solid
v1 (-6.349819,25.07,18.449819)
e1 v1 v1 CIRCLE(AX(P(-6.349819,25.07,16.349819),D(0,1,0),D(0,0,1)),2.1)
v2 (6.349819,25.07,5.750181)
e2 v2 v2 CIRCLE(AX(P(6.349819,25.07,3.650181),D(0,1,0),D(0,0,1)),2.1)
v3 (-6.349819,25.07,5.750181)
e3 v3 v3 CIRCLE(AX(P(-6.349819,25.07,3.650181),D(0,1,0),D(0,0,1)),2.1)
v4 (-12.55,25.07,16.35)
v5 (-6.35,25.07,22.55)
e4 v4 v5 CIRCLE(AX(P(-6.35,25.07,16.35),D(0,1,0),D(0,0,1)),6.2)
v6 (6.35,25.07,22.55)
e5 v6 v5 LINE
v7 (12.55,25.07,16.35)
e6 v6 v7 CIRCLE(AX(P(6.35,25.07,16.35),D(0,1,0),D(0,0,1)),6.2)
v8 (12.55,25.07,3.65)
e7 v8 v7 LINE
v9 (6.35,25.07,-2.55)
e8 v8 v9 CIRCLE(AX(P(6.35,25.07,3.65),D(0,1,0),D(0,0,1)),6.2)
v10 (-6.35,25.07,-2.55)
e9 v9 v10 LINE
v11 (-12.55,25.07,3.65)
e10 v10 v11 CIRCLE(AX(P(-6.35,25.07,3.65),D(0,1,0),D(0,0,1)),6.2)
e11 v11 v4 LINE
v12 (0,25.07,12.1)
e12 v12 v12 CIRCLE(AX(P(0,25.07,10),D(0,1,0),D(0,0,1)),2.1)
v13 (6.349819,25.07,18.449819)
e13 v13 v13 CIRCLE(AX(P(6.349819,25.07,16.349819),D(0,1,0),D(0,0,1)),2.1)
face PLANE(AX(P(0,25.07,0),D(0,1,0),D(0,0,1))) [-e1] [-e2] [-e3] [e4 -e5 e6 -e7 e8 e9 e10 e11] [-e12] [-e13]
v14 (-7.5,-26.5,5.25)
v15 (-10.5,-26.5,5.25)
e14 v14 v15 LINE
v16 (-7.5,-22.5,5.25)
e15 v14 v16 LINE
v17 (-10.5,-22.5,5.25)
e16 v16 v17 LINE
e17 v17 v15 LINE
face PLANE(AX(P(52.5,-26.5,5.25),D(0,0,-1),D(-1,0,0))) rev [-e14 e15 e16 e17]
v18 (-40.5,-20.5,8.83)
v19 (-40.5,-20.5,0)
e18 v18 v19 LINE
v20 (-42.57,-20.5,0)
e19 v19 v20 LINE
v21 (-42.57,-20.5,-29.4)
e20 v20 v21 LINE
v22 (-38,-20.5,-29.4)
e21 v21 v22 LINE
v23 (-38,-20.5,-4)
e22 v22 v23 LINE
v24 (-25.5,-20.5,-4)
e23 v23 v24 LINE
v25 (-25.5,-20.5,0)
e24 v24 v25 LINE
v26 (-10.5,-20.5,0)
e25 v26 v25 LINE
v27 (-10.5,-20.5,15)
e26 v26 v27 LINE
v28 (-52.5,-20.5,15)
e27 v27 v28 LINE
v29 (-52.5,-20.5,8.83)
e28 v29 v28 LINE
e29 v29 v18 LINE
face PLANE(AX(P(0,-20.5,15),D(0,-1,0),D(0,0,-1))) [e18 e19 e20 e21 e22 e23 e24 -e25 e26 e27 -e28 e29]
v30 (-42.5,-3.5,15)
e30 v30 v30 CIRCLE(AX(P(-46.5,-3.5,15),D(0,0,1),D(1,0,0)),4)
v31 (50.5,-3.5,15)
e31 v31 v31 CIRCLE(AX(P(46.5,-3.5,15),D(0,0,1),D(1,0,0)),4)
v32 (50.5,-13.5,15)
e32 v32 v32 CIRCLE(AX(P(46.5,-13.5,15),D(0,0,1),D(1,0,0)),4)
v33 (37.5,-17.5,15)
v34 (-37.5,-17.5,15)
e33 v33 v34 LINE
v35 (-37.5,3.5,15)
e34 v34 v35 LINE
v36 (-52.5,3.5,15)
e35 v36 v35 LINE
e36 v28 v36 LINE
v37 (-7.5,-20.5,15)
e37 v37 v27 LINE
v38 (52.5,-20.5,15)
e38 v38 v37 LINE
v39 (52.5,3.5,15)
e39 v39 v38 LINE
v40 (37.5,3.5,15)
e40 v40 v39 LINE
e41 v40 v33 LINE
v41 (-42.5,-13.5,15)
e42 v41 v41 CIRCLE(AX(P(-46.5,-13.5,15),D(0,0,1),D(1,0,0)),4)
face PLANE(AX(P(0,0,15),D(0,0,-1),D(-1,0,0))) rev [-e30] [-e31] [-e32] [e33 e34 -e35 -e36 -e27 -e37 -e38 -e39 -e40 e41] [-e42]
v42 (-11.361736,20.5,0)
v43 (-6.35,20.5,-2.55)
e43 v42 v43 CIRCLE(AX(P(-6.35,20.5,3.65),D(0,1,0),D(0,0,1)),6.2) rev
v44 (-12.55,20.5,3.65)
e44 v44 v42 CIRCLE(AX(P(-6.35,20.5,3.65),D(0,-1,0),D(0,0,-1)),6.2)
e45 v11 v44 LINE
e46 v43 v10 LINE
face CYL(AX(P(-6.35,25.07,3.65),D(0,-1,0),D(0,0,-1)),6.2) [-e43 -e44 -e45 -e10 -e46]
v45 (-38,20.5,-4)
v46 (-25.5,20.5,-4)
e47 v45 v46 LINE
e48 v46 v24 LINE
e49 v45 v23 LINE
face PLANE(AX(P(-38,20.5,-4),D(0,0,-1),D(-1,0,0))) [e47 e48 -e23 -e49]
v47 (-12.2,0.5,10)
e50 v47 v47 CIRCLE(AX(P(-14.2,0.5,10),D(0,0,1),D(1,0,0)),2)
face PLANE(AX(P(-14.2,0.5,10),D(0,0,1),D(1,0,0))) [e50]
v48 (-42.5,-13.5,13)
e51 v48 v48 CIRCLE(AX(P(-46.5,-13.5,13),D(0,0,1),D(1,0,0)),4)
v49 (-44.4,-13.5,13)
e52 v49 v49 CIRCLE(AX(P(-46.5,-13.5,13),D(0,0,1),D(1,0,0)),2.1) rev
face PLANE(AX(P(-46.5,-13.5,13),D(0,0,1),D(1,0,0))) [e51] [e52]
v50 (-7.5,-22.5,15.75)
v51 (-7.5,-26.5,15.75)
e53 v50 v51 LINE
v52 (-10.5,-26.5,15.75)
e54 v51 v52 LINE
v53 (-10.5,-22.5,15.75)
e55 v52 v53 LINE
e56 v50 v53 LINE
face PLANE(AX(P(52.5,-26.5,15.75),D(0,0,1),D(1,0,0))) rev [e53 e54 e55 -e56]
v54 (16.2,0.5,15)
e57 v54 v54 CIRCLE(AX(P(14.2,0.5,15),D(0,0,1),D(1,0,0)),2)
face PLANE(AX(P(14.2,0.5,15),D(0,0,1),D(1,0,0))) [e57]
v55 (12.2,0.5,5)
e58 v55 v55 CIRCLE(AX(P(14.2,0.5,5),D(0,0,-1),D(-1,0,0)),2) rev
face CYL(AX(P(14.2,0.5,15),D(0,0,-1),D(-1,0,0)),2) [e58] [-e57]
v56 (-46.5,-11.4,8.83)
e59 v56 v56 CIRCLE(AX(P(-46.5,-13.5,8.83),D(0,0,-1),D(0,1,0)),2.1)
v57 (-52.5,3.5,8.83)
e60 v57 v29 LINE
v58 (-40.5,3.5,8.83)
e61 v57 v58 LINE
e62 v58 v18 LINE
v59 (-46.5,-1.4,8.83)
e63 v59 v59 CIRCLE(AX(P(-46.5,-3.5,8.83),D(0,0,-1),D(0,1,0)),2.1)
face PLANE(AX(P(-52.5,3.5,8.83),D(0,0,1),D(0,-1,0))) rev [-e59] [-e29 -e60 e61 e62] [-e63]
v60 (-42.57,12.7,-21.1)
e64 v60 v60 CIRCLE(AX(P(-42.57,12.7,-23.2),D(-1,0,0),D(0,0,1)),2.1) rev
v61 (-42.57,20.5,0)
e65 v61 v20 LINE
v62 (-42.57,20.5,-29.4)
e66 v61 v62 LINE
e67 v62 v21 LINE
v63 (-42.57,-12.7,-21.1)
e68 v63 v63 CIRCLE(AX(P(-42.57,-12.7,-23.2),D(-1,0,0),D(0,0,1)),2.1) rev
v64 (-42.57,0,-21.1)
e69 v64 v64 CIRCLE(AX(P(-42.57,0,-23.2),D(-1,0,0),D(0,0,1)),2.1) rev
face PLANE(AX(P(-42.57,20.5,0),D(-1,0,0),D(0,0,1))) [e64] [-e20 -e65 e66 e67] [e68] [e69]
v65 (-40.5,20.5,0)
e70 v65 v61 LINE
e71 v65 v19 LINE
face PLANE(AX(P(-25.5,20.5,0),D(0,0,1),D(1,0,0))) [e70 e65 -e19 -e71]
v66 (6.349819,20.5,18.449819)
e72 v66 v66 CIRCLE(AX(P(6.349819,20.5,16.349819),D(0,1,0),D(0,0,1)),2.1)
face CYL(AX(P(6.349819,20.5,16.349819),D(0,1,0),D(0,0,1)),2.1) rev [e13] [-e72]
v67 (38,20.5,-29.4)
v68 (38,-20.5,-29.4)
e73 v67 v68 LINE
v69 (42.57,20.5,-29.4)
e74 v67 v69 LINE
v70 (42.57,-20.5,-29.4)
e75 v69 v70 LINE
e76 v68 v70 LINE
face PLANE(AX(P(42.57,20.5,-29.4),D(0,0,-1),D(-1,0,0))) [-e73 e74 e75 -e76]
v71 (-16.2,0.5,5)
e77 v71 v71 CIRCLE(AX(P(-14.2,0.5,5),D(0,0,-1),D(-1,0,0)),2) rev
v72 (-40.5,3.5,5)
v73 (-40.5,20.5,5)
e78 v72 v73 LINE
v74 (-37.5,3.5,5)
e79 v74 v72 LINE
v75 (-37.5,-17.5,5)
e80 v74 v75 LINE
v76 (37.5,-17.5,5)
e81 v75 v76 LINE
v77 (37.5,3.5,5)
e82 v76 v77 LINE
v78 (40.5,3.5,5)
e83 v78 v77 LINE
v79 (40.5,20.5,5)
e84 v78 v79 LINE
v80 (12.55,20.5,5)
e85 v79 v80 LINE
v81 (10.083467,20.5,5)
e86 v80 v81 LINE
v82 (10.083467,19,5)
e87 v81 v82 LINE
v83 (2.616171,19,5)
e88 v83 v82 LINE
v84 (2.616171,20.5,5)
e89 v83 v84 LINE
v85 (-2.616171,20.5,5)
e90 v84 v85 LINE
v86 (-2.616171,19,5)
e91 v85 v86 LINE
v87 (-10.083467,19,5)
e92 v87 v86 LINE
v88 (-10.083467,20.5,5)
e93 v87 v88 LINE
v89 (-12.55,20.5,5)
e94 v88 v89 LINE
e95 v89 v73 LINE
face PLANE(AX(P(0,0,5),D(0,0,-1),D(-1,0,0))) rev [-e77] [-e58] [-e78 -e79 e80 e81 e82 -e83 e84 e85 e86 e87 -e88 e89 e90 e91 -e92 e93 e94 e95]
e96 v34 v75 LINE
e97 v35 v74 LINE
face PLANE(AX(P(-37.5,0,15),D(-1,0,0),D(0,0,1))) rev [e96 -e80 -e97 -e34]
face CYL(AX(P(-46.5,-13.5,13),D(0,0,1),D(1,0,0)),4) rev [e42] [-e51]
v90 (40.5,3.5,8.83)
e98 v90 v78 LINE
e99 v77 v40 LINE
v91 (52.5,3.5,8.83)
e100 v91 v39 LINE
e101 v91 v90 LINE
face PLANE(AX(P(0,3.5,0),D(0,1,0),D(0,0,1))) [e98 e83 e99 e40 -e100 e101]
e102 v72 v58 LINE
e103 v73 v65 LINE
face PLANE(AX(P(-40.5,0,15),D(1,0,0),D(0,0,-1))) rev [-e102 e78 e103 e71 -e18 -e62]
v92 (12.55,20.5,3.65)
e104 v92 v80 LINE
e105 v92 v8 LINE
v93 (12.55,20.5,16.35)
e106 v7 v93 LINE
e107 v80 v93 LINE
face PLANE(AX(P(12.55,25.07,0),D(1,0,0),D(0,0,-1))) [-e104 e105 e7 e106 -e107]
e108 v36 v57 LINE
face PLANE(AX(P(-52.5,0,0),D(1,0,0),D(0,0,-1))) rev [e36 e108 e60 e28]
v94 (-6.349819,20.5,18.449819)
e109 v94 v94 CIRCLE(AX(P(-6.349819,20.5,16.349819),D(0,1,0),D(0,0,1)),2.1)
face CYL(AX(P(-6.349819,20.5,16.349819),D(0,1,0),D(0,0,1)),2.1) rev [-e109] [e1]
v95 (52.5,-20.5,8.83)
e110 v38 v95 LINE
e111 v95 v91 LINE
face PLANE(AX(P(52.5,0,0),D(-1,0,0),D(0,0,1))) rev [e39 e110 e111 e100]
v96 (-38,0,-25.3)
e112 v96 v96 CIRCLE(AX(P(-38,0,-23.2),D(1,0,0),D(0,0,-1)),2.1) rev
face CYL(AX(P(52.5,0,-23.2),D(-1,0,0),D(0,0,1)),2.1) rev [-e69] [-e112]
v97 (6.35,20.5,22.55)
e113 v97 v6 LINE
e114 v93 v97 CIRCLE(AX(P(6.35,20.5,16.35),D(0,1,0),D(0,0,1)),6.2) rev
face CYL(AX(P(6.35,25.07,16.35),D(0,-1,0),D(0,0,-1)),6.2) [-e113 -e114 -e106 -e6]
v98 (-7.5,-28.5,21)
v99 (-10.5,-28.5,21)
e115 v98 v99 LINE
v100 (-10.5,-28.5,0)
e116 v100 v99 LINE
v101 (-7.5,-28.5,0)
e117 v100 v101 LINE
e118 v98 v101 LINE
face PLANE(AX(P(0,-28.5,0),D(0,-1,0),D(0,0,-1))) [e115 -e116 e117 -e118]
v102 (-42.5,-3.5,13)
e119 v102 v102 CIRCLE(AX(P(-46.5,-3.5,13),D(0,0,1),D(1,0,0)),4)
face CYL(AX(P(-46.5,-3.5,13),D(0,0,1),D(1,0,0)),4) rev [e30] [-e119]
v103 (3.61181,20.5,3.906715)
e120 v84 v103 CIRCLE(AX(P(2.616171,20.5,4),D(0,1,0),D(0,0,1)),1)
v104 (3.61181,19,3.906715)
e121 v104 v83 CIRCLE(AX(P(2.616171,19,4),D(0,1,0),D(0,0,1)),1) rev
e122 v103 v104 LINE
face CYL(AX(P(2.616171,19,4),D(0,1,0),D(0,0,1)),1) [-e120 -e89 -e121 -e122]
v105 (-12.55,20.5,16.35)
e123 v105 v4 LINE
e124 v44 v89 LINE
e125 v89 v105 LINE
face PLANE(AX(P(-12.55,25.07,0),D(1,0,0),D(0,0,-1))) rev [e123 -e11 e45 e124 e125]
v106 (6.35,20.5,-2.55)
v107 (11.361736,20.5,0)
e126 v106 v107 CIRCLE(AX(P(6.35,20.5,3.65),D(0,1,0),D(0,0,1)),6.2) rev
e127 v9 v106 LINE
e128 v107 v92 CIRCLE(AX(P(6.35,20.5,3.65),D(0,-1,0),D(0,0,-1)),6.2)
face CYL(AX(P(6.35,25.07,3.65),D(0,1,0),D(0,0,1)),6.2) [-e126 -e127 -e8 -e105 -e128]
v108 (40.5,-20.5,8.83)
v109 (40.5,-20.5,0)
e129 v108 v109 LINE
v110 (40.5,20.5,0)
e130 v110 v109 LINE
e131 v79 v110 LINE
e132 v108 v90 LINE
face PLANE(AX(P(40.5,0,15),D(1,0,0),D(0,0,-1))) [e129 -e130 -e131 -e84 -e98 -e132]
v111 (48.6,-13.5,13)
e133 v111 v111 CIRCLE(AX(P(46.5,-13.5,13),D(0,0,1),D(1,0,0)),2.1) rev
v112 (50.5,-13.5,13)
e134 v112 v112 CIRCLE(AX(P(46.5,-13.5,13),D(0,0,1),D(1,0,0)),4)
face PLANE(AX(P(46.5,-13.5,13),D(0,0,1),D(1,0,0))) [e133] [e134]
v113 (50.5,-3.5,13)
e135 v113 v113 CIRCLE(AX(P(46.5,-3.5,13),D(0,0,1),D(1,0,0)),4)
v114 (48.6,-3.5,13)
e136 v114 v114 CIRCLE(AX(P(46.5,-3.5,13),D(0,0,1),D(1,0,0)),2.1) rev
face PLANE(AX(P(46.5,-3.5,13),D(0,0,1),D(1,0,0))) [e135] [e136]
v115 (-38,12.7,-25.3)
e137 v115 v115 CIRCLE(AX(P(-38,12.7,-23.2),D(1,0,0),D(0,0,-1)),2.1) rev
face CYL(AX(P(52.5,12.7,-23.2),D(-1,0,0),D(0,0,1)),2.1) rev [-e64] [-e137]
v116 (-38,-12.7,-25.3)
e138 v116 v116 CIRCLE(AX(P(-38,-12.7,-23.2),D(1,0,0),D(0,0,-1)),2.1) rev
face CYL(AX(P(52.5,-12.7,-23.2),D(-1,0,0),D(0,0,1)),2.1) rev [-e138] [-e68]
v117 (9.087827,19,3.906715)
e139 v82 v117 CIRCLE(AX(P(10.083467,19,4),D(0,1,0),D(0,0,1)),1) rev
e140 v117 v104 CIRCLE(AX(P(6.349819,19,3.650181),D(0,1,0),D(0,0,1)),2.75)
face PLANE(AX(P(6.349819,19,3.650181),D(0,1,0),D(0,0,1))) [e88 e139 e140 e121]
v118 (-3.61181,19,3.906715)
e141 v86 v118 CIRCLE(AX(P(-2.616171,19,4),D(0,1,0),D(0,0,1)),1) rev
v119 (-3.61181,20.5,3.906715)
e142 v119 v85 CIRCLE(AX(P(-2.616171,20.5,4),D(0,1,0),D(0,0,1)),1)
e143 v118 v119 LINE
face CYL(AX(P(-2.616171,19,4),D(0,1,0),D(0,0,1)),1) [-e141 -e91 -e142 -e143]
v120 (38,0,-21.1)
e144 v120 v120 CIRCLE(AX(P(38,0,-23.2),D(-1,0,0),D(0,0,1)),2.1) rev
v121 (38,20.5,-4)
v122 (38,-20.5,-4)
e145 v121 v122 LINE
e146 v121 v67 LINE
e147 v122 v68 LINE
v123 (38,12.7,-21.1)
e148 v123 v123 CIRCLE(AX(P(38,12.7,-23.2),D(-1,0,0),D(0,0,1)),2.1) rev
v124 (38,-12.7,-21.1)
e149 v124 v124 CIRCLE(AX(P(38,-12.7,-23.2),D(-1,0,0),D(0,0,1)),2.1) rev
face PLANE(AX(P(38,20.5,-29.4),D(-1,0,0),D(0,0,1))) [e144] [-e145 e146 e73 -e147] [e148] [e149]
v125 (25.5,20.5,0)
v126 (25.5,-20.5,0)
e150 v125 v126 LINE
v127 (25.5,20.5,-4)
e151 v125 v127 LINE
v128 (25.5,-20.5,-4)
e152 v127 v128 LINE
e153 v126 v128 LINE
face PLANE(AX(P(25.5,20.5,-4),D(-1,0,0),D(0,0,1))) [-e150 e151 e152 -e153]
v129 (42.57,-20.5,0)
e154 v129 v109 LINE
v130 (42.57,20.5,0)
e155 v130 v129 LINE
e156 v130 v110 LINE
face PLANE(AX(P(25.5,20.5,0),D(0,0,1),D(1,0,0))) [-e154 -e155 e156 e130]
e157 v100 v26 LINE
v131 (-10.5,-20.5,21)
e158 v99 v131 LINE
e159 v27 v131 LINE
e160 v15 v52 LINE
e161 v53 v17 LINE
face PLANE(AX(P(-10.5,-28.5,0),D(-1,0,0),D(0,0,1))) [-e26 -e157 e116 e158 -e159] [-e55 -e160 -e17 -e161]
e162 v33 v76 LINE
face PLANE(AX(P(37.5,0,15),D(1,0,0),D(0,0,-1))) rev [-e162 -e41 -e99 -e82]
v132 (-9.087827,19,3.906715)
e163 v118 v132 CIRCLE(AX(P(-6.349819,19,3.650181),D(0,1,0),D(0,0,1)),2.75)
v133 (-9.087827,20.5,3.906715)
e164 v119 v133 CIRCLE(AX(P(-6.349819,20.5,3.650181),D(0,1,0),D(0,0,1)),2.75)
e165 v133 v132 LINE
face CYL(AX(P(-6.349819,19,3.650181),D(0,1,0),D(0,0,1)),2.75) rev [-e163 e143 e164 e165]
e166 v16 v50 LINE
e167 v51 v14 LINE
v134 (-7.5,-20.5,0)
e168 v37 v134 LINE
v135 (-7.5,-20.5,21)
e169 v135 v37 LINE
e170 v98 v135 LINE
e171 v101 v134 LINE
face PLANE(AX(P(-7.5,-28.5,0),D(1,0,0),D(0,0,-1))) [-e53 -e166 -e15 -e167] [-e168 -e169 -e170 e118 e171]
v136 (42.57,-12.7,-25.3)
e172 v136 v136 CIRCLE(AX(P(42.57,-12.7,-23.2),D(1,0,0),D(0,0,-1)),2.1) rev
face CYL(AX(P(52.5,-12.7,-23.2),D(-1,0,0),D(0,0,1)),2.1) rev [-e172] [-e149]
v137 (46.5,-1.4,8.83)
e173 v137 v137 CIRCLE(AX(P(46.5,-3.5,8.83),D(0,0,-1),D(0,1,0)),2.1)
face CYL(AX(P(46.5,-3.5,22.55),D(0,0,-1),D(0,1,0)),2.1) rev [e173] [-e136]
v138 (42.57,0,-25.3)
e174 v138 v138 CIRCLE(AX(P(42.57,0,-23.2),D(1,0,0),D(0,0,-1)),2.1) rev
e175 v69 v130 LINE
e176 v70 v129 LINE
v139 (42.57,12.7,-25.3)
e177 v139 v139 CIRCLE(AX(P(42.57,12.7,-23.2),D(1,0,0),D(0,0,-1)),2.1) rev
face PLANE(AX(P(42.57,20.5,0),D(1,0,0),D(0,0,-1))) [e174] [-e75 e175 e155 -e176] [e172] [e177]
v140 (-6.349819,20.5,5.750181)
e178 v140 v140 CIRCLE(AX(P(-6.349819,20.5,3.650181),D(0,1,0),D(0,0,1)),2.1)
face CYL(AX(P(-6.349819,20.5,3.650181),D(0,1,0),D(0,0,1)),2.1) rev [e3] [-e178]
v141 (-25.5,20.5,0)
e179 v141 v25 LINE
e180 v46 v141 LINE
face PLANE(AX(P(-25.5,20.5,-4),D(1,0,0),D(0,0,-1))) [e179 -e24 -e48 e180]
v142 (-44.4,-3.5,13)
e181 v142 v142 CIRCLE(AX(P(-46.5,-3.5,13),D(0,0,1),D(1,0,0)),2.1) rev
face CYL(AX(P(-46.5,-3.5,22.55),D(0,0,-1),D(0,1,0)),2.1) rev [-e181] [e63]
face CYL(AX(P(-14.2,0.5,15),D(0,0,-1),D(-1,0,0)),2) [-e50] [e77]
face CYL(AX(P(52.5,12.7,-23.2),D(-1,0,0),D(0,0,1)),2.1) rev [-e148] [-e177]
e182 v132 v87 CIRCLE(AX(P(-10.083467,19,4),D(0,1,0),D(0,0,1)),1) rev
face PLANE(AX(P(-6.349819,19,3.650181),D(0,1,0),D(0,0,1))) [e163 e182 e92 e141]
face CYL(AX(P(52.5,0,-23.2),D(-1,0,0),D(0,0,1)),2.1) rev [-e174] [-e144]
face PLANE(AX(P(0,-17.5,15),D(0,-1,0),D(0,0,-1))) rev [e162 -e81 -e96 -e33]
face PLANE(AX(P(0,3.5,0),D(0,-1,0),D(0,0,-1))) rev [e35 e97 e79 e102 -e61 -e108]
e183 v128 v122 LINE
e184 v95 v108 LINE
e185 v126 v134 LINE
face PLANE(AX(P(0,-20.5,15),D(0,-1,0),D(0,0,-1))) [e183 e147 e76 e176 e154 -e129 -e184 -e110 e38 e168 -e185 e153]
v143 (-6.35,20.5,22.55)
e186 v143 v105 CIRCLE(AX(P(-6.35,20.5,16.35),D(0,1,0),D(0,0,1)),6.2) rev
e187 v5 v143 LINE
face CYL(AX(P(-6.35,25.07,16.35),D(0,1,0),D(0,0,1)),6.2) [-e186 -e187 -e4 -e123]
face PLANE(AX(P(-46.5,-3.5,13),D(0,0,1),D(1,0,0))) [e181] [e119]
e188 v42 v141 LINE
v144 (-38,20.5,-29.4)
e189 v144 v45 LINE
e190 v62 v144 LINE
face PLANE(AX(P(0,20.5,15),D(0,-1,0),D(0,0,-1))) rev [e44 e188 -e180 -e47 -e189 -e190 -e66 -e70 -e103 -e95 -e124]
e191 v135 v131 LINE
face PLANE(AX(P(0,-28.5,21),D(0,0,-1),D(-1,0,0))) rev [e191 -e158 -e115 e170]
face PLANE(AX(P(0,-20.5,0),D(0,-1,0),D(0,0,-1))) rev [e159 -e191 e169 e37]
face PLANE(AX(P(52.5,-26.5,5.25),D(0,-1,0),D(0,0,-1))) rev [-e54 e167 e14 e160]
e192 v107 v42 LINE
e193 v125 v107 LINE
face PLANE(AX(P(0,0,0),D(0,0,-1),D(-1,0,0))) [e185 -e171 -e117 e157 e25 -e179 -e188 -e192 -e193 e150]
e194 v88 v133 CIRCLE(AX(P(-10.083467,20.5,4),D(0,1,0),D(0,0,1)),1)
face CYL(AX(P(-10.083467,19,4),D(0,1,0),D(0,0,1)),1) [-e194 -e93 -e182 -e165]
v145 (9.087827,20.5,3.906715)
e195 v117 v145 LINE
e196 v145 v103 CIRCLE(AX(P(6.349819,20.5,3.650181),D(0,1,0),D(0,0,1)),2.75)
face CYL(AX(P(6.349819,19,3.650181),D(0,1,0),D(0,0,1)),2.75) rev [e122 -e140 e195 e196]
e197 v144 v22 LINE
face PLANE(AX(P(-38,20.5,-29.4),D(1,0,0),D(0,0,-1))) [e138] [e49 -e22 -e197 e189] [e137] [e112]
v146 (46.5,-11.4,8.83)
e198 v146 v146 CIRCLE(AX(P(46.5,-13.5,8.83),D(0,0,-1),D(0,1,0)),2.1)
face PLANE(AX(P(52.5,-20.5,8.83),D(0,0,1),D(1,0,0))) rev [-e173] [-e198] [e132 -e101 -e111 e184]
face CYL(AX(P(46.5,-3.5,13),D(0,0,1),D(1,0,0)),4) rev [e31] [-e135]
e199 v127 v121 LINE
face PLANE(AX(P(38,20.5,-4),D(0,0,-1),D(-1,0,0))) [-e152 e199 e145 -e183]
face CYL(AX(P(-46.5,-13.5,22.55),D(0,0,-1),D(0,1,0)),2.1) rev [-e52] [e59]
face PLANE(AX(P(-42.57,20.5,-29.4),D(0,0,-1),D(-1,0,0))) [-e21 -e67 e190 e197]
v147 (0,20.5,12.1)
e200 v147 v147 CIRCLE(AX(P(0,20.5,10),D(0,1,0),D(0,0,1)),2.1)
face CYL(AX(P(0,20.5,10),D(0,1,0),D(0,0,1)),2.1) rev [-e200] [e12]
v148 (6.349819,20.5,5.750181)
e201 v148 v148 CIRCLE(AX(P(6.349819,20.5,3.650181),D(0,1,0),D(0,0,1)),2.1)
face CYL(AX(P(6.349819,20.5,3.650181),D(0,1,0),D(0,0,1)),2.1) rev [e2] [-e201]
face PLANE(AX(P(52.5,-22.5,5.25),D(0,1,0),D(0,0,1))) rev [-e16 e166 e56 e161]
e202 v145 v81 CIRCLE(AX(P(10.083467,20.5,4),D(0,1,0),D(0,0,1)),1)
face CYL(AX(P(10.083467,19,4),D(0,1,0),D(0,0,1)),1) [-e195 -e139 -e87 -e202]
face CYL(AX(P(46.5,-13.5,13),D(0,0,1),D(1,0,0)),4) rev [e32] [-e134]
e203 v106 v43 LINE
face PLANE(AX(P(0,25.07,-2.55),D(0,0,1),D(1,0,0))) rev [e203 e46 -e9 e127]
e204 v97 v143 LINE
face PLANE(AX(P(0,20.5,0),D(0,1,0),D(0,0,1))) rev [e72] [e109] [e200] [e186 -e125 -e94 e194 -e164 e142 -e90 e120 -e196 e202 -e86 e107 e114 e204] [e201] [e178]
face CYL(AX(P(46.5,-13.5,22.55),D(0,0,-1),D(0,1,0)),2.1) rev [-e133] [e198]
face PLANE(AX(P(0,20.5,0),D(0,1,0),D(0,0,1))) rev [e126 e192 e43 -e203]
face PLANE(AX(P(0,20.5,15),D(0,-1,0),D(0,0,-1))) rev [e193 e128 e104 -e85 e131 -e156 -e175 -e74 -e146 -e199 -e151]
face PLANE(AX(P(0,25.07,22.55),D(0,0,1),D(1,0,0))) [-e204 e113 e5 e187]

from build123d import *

# Parameters (mm, degrees)
SKETCH1_W                = 75
SKETCH1_H                = 35
BOSS_EXTRUDE1_DEPTH      = 5
SKETCH2_R                = 2
BOSS_EXTRUDE2_DEPTH      = 10
SKETCH3_W                = 75
SKETCH3_H                = 35
BOSS_EXTRUDE3_DEPTH      = 15
CUT_EXTRUDE2_DEPTH       = 10
SKETCH8_W                = 12.55
SKETCH8_H                = 5
SKETCH8_H_2              = 2.55
BOSS_EXTRUDE6_DEPTH      = 4.57
SKETCH9_R                = 2.1
CUT_EXTRUDE3_DEPTH       = 4.57
SKETCH14_W               = 3
SKETCH14_H               = 10
CUT_EXTRUDE5_DEPTH       = 17
SKETCH15_R               = 2.75
CUT_EXTRUDE6_DEPTH       = 1.5
FILLET1_R                = 1
CUT_EXTRUDE7_START       = -5
SKETCH19_R               = 2
CUT_EXTRUDE7_DEPTH       = 5
SKETCH20_W               = 6.17
SKETCH20_H               = 24
BOSS_EXTRUDE7_DEPTH      = 12
SKETCH21_W               = 6.17
SKETCH21_H               = 24
BOSS_EXTRUDE8_DEPTH      = 12
SKETCH24_R               = 2.1
CUT_EXTRUDE8_DEPTH       = 60.774520492
SKETCH25_R               = 4
CUT_EXTRUDE9_DEPTH       = 2
SKETCH26_W               = 3
SKETCH26_H               = 15
SKETCH26_H_2             = 6
BOSS_EXTRUDE9_DEPTH      = 8
SKETCH27_W               = 10.5
SKETCH27_H               = 4
CUT_EXTRUDE10_DEPTH      = 73.730684721
BOSS_EXTRUDE10_DEPTH     = 41
CUT_EXTRUDE11_DEPTH      = 100.332069343
CUT_EXTRUDE11_DEPTH_BACK = 100.332069343
SKETCH30_R               = 2.1
FILLET2_R                = 6.2


with BuildPart() as part:
    # Sketch1 → Boss-Extrude1 (new body)
    with BuildSketch(Plane.XY):
        Rectangle(SKETCH1_W, SKETCH1_H)
    extrude(amount=BOSS_EXTRUDE1_DEPTH)

    # Sketch2 → Boss-Extrude2 (add)
    with BuildSketch(Plane.XY.offset(5)):
        with Locations(Location((-14.2, 0.5, 0), (0, 0, 180))):
            Circle(SKETCH2_R)
        with Locations(Location((14.2, 0.5, 0), (0, 0, 180))):
            Circle(SKETCH2_R)
    extrude(amount=BOSS_EXTRUDE2_DEPTH)

    # Sketch3 → Boss-Extrude3 (add)
    with BuildSketch(Plane(origin=(0, 0, 0), x_dir=(-1, 0, 0), z_dir=(0, 0, -1))):
        Polygon((40.5, 20.5), (-37.5, 20.5), (-40.5, 20.5), (-40.5, -20.5), (40.5, -20.5), (40.5, -17.5), align=None)
        Rectangle(SKETCH3_W, SKETCH3_H, mode=Mode.SUBTRACT)
    extrude(amount=-BOSS_EXTRUDE3_DEPTH)

    # Sketch4 → Cut-Extrude2 (cut)
    with BuildSketch(Plane(origin=(0, 20.5, 0), x_dir=(1, 0, 0), z_dir=(0, 1, 0))):
        Polygon((-37.5, -5), (-37.5, -12.5), (-37.5, -14), (-37.5, -15), (37.5, -15), (37.5, -14), (37.5, -12.5), (37.5, -5), align=None)
    extrude(amount=-CUT_EXTRUDE2_DEPTH, mode=Mode.SUBTRACT)

    # Sketch8 → Boss-Extrude6 (add)
    with BuildSketch(Plane(origin=(0, 20.5, 0), x_dir=(1, 0, 0), z_dir=(0, 1, 0))):
        Polygon((0, -15), (0, -5), (-12.55, -5), (-12.55, -22.55), (0, -22.55), align=None)
        Polygon((12.55, -5), (0, -5), (0, -15), (0, -22.55), (12.55, -22.55), align=None)
        with Locations((-6.275, -2.5)):
            Rectangle(SKETCH8_W, SKETCH8_H)
        with Locations((-6.275, 1.275)):
            Rectangle(SKETCH8_W, SKETCH8_H_2)
        with Locations((6.275, 1.275)):
            Rectangle(SKETCH8_W, SKETCH8_H_2)
        with Locations((6.275, -2.5)):
            Rectangle(SKETCH8_W, SKETCH8_H)
    extrude(amount=BOSS_EXTRUDE6_DEPTH)

    # Sketch9 → Cut-Extrude3 (cut)
    with BuildSketch(Plane(origin=(0, 25.07, 0), x_dir=(1, 0, 0), z_dir=(0, 1, 0))):
        with Locations(Location((0, -10, 0), (0, 0, 270))):
            Circle(SKETCH9_R)
        with Locations(Location((-6.349818895, -3.650181105, 0), (0, 0, 270))):
            Circle(SKETCH9_R)
        with Locations(Location((6.349818895, -3.650181105, 0), (0, 0, 270))):
            Circle(SKETCH9_R)
        with Locations(Location((6.349818895, -16.349818895, 0), (0, 0, 270))):
            Circle(SKETCH9_R)
        with Locations(Location((-6.349818895, -16.349818895, 0), (0, 0, 270))):
            Circle(SKETCH9_R)
    extrude(amount=-CUT_EXTRUDE3_DEPTH, mode=Mode.SUBTRACT)

    # Sketch14 → Cut-Extrude5 (cut)
    with BuildSketch(Plane(origin=(0, 20.5, 0), x_dir=(1, 0, 0), z_dir=(0, 1, 0))):
        with Locations((-39, -10)):
            Rectangle(SKETCH14_W, SKETCH14_H)
        with Locations((39, -10)):
            Rectangle(SKETCH14_W, SKETCH14_H)
    extrude(amount=-CUT_EXTRUDE5_DEPTH, mode=Mode.SUBTRACT)

    # Sketch15 → Cut-Extrude6 (cut)
    with BuildSketch(Plane(origin=(0, 20.5, 0), x_dir=(1, 0, 0), z_dir=(0, 1, 0))):
        with Locations((-6.349818895, -3.650181105)):
            Circle(SKETCH15_R)
        with Locations((6.349818895, -3.650181105)):
            Circle(SKETCH15_R)
    extrude(amount=-CUT_EXTRUDE6_DEPTH, mode=Mode.SUBTRACT)

    # Fillet1
    fillet1_edges = [part.edges().sort_by_distance(p)[0] for p in [
        (-8.745750645, 19.75, 5),
        (-3.953887145, 19.75, 5),
        (3.953887145, 19.75, 5),
        (8.745750645, 19.75, 5),
    ]]
    fillet(fillet1_edges, radius=FILLET1_R)

    # Sketch19 → Cut-Extrude7 (cut)
    with BuildSketch(Plane.XY.offset(15).offset(CUT_EXTRUDE7_START)):
        with Locations(Location((-14.2, 0.5, 0), (0, 0, 180))):
            Circle(SKETCH19_R)
    extrude(amount=CUT_EXTRUDE7_DEPTH, mode=Mode.SUBTRACT)

    # Sketch20 → Boss-Extrude7 (add)
    with BuildSketch(Plane(origin=(40.5, 0, 0), x_dir=(0, 0, -1), z_dir=(1, 0, 0))):
        with Locations((-11.915, -8.5)):
            Rectangle(SKETCH20_W, SKETCH20_H)
    extrude(amount=BOSS_EXTRUDE7_DEPTH)

    # Sketch21 → Boss-Extrude8 (add)
    with BuildSketch(Plane.ZY.offset(40.5)):
        with Locations((11.915, -8.5)):
            Rectangle(SKETCH21_W, SKETCH21_H)
    extrude(amount=BOSS_EXTRUDE8_DEPTH)

    # Sketch24 → Cut-Extrude8 (cut, through all)
    with BuildSketch(Plane(origin=(0, 0, 8.83), x_dir=(-1, 0, 0), z_dir=(0, 0, -1))):
        with Locations(Location((-46.5, -3.5, 0), (0, 0, 90))):
            Circle(SKETCH24_R)
        with Locations(Location((-46.5, -13.5, 0), (0, 0, 90))):
            Circle(SKETCH24_R)
        with Locations(Location((46.5, -3.5, 0), (0, 0, 90))):
            Circle(SKETCH24_R)
        with Locations(Location((46.5, -13.5, 0), (0, 0, 90))):
            Circle(SKETCH24_R)
    extrude(amount=-CUT_EXTRUDE8_DEPTH, mode=Mode.SUBTRACT)

    # Sketch25 → Cut-Extrude9 (cut)
    with BuildSketch(Plane.XY.offset(15)):
        with Locations((-46.5, -3.5)):
            Circle(SKETCH25_R)
        with Locations((-46.5, -13.5)):
            Circle(SKETCH25_R)
        with Locations((46.5, -13.5)):
            Circle(SKETCH25_R)
        with Locations((46.5, -3.5)):
            Circle(SKETCH25_R)
    extrude(amount=-CUT_EXTRUDE9_DEPTH, mode=Mode.SUBTRACT)

    # Sketch26 → Boss-Extrude9 (add)
    with BuildSketch(Plane.XZ.offset(20.5)):
        with Locations((-9, 7.5)):
            Rectangle(SKETCH26_W, SKETCH26_H)
        with Locations((-9, 18)):
            Rectangle(SKETCH26_W, SKETCH26_H_2)
    extrude(amount=BOSS_EXTRUDE9_DEPTH)

    # Sketch27 → Cut-Extrude10 (cut, through all)
    with BuildSketch(Plane.ZY.offset(10.5)):
        with Locations((10.5, -24.5)):
            Rectangle(SKETCH27_W, SKETCH27_H)
    extrude(amount=-CUT_EXTRUDE10_DEPTH, mode=Mode.SUBTRACT)

    # Sketch28 → Boss-Extrude10 (add)
    with BuildSketch(Plane.XZ.offset(20.5)):
        Polygon((-25.5, 0), (-42.57, 0), (-42.57, -29.4), (-38, -29.4), (-38, -4), (-25.5, -4), align=None)
        Polygon((25.5, 0), (42.57, 0), (42.57, -29.4), (38, -29.4), (38, -4), (25.5, -4), align=None)
    extrude(amount=-BOSS_EXTRUDE10_DEPTH)

    # Sketch30 → Cut-Extrude11 (cut, two sides: drawn at the far end of the back side and taken through both)
    with BuildSketch(Plane(origin=(-38, 0, 0), x_dir=(0, 0, -1), z_dir=(1, 0, 0)).offset(-CUT_EXTRUDE11_DEPTH_BACK)):
        with Locations(Location((23.2, 0, 0), (0, 0, 180))):
            Circle(SKETCH30_R)
        with Locations(Location((23.2, 12.7, 0), (0, 0, 180))):
            Circle(SKETCH30_R)
        with Locations(Location((23.2, -12.7, 0), (0, 0, 180))):
            Circle(SKETCH30_R)
    extrude(amount=CUT_EXTRUDE11_DEPTH + CUT_EXTRUDE11_DEPTH_BACK, mode=Mode.SUBTRACT)

    # Fillet2
    # the kernel refuses this fillet: 6.2 mm, written as the material it takes off along each edge
    with BuildSketch(Plane(origin=(12.55, 5, 22.55), x_dir=(0, 0, -1), z_dir=(0, 1, 0))) as fillet2_piece_1:
        with BuildLine():
            CenterArc((FILLET2_R, FILLET2_R), FILLET2_R, 180, 90)
            Line((0, FILLET2_R), (0, 0))
            Line((0, 0), (FILLET2_R, 0))
        make_face()
    extrude(amount=35.57, mode=Mode.SUBTRACT)
    with BuildSketch(Plane(origin=(12.55, 20.5, -2.55), x_dir=(0, 0, 1), z_dir=(0, 1, 0))) as fillet2_piece_2:
        with BuildLine():
            CenterArc((FILLET2_R, -FILLET2_R), FILLET2_R, 90, 90)
            Line((0, -FILLET2_R), (0, 0))
            Line((0, 0), (FILLET2_R, 0))
        make_face()
    extrude(amount=20.07, mode=Mode.SUBTRACT)
    with BuildSketch(Plane(origin=(-12.55, 20.5, -2.55), x_dir=(0, 0, 1), z_dir=(0, 1, 0))) as fillet2_piece_3:
        with BuildLine():
            CenterArc((FILLET2_R, FILLET2_R), FILLET2_R, 180, 90)
            Line((0, FILLET2_R), (0, 0))
            Line((0, 0), (FILLET2_R, 0))
        make_face()
    extrude(amount=20.07, mode=Mode.SUBTRACT)
    with BuildSketch(Plane(origin=(-12.55, 5, 22.55), x_dir=(0, 0, -1), z_dir=(0, 1, 0))) as fillet2_piece_4:
        with BuildLine():
            CenterArc((FILLET2_R, -FILLET2_R), FILLET2_R, 90, 90)
            Line((0, -FILLET2_R), (0, 0))
            Line((0, 0), (FILLET2_R, 0))
        make_face()
    extrude(amount=35.57, mode=Mode.SUBTRACT)


solid = part.part
